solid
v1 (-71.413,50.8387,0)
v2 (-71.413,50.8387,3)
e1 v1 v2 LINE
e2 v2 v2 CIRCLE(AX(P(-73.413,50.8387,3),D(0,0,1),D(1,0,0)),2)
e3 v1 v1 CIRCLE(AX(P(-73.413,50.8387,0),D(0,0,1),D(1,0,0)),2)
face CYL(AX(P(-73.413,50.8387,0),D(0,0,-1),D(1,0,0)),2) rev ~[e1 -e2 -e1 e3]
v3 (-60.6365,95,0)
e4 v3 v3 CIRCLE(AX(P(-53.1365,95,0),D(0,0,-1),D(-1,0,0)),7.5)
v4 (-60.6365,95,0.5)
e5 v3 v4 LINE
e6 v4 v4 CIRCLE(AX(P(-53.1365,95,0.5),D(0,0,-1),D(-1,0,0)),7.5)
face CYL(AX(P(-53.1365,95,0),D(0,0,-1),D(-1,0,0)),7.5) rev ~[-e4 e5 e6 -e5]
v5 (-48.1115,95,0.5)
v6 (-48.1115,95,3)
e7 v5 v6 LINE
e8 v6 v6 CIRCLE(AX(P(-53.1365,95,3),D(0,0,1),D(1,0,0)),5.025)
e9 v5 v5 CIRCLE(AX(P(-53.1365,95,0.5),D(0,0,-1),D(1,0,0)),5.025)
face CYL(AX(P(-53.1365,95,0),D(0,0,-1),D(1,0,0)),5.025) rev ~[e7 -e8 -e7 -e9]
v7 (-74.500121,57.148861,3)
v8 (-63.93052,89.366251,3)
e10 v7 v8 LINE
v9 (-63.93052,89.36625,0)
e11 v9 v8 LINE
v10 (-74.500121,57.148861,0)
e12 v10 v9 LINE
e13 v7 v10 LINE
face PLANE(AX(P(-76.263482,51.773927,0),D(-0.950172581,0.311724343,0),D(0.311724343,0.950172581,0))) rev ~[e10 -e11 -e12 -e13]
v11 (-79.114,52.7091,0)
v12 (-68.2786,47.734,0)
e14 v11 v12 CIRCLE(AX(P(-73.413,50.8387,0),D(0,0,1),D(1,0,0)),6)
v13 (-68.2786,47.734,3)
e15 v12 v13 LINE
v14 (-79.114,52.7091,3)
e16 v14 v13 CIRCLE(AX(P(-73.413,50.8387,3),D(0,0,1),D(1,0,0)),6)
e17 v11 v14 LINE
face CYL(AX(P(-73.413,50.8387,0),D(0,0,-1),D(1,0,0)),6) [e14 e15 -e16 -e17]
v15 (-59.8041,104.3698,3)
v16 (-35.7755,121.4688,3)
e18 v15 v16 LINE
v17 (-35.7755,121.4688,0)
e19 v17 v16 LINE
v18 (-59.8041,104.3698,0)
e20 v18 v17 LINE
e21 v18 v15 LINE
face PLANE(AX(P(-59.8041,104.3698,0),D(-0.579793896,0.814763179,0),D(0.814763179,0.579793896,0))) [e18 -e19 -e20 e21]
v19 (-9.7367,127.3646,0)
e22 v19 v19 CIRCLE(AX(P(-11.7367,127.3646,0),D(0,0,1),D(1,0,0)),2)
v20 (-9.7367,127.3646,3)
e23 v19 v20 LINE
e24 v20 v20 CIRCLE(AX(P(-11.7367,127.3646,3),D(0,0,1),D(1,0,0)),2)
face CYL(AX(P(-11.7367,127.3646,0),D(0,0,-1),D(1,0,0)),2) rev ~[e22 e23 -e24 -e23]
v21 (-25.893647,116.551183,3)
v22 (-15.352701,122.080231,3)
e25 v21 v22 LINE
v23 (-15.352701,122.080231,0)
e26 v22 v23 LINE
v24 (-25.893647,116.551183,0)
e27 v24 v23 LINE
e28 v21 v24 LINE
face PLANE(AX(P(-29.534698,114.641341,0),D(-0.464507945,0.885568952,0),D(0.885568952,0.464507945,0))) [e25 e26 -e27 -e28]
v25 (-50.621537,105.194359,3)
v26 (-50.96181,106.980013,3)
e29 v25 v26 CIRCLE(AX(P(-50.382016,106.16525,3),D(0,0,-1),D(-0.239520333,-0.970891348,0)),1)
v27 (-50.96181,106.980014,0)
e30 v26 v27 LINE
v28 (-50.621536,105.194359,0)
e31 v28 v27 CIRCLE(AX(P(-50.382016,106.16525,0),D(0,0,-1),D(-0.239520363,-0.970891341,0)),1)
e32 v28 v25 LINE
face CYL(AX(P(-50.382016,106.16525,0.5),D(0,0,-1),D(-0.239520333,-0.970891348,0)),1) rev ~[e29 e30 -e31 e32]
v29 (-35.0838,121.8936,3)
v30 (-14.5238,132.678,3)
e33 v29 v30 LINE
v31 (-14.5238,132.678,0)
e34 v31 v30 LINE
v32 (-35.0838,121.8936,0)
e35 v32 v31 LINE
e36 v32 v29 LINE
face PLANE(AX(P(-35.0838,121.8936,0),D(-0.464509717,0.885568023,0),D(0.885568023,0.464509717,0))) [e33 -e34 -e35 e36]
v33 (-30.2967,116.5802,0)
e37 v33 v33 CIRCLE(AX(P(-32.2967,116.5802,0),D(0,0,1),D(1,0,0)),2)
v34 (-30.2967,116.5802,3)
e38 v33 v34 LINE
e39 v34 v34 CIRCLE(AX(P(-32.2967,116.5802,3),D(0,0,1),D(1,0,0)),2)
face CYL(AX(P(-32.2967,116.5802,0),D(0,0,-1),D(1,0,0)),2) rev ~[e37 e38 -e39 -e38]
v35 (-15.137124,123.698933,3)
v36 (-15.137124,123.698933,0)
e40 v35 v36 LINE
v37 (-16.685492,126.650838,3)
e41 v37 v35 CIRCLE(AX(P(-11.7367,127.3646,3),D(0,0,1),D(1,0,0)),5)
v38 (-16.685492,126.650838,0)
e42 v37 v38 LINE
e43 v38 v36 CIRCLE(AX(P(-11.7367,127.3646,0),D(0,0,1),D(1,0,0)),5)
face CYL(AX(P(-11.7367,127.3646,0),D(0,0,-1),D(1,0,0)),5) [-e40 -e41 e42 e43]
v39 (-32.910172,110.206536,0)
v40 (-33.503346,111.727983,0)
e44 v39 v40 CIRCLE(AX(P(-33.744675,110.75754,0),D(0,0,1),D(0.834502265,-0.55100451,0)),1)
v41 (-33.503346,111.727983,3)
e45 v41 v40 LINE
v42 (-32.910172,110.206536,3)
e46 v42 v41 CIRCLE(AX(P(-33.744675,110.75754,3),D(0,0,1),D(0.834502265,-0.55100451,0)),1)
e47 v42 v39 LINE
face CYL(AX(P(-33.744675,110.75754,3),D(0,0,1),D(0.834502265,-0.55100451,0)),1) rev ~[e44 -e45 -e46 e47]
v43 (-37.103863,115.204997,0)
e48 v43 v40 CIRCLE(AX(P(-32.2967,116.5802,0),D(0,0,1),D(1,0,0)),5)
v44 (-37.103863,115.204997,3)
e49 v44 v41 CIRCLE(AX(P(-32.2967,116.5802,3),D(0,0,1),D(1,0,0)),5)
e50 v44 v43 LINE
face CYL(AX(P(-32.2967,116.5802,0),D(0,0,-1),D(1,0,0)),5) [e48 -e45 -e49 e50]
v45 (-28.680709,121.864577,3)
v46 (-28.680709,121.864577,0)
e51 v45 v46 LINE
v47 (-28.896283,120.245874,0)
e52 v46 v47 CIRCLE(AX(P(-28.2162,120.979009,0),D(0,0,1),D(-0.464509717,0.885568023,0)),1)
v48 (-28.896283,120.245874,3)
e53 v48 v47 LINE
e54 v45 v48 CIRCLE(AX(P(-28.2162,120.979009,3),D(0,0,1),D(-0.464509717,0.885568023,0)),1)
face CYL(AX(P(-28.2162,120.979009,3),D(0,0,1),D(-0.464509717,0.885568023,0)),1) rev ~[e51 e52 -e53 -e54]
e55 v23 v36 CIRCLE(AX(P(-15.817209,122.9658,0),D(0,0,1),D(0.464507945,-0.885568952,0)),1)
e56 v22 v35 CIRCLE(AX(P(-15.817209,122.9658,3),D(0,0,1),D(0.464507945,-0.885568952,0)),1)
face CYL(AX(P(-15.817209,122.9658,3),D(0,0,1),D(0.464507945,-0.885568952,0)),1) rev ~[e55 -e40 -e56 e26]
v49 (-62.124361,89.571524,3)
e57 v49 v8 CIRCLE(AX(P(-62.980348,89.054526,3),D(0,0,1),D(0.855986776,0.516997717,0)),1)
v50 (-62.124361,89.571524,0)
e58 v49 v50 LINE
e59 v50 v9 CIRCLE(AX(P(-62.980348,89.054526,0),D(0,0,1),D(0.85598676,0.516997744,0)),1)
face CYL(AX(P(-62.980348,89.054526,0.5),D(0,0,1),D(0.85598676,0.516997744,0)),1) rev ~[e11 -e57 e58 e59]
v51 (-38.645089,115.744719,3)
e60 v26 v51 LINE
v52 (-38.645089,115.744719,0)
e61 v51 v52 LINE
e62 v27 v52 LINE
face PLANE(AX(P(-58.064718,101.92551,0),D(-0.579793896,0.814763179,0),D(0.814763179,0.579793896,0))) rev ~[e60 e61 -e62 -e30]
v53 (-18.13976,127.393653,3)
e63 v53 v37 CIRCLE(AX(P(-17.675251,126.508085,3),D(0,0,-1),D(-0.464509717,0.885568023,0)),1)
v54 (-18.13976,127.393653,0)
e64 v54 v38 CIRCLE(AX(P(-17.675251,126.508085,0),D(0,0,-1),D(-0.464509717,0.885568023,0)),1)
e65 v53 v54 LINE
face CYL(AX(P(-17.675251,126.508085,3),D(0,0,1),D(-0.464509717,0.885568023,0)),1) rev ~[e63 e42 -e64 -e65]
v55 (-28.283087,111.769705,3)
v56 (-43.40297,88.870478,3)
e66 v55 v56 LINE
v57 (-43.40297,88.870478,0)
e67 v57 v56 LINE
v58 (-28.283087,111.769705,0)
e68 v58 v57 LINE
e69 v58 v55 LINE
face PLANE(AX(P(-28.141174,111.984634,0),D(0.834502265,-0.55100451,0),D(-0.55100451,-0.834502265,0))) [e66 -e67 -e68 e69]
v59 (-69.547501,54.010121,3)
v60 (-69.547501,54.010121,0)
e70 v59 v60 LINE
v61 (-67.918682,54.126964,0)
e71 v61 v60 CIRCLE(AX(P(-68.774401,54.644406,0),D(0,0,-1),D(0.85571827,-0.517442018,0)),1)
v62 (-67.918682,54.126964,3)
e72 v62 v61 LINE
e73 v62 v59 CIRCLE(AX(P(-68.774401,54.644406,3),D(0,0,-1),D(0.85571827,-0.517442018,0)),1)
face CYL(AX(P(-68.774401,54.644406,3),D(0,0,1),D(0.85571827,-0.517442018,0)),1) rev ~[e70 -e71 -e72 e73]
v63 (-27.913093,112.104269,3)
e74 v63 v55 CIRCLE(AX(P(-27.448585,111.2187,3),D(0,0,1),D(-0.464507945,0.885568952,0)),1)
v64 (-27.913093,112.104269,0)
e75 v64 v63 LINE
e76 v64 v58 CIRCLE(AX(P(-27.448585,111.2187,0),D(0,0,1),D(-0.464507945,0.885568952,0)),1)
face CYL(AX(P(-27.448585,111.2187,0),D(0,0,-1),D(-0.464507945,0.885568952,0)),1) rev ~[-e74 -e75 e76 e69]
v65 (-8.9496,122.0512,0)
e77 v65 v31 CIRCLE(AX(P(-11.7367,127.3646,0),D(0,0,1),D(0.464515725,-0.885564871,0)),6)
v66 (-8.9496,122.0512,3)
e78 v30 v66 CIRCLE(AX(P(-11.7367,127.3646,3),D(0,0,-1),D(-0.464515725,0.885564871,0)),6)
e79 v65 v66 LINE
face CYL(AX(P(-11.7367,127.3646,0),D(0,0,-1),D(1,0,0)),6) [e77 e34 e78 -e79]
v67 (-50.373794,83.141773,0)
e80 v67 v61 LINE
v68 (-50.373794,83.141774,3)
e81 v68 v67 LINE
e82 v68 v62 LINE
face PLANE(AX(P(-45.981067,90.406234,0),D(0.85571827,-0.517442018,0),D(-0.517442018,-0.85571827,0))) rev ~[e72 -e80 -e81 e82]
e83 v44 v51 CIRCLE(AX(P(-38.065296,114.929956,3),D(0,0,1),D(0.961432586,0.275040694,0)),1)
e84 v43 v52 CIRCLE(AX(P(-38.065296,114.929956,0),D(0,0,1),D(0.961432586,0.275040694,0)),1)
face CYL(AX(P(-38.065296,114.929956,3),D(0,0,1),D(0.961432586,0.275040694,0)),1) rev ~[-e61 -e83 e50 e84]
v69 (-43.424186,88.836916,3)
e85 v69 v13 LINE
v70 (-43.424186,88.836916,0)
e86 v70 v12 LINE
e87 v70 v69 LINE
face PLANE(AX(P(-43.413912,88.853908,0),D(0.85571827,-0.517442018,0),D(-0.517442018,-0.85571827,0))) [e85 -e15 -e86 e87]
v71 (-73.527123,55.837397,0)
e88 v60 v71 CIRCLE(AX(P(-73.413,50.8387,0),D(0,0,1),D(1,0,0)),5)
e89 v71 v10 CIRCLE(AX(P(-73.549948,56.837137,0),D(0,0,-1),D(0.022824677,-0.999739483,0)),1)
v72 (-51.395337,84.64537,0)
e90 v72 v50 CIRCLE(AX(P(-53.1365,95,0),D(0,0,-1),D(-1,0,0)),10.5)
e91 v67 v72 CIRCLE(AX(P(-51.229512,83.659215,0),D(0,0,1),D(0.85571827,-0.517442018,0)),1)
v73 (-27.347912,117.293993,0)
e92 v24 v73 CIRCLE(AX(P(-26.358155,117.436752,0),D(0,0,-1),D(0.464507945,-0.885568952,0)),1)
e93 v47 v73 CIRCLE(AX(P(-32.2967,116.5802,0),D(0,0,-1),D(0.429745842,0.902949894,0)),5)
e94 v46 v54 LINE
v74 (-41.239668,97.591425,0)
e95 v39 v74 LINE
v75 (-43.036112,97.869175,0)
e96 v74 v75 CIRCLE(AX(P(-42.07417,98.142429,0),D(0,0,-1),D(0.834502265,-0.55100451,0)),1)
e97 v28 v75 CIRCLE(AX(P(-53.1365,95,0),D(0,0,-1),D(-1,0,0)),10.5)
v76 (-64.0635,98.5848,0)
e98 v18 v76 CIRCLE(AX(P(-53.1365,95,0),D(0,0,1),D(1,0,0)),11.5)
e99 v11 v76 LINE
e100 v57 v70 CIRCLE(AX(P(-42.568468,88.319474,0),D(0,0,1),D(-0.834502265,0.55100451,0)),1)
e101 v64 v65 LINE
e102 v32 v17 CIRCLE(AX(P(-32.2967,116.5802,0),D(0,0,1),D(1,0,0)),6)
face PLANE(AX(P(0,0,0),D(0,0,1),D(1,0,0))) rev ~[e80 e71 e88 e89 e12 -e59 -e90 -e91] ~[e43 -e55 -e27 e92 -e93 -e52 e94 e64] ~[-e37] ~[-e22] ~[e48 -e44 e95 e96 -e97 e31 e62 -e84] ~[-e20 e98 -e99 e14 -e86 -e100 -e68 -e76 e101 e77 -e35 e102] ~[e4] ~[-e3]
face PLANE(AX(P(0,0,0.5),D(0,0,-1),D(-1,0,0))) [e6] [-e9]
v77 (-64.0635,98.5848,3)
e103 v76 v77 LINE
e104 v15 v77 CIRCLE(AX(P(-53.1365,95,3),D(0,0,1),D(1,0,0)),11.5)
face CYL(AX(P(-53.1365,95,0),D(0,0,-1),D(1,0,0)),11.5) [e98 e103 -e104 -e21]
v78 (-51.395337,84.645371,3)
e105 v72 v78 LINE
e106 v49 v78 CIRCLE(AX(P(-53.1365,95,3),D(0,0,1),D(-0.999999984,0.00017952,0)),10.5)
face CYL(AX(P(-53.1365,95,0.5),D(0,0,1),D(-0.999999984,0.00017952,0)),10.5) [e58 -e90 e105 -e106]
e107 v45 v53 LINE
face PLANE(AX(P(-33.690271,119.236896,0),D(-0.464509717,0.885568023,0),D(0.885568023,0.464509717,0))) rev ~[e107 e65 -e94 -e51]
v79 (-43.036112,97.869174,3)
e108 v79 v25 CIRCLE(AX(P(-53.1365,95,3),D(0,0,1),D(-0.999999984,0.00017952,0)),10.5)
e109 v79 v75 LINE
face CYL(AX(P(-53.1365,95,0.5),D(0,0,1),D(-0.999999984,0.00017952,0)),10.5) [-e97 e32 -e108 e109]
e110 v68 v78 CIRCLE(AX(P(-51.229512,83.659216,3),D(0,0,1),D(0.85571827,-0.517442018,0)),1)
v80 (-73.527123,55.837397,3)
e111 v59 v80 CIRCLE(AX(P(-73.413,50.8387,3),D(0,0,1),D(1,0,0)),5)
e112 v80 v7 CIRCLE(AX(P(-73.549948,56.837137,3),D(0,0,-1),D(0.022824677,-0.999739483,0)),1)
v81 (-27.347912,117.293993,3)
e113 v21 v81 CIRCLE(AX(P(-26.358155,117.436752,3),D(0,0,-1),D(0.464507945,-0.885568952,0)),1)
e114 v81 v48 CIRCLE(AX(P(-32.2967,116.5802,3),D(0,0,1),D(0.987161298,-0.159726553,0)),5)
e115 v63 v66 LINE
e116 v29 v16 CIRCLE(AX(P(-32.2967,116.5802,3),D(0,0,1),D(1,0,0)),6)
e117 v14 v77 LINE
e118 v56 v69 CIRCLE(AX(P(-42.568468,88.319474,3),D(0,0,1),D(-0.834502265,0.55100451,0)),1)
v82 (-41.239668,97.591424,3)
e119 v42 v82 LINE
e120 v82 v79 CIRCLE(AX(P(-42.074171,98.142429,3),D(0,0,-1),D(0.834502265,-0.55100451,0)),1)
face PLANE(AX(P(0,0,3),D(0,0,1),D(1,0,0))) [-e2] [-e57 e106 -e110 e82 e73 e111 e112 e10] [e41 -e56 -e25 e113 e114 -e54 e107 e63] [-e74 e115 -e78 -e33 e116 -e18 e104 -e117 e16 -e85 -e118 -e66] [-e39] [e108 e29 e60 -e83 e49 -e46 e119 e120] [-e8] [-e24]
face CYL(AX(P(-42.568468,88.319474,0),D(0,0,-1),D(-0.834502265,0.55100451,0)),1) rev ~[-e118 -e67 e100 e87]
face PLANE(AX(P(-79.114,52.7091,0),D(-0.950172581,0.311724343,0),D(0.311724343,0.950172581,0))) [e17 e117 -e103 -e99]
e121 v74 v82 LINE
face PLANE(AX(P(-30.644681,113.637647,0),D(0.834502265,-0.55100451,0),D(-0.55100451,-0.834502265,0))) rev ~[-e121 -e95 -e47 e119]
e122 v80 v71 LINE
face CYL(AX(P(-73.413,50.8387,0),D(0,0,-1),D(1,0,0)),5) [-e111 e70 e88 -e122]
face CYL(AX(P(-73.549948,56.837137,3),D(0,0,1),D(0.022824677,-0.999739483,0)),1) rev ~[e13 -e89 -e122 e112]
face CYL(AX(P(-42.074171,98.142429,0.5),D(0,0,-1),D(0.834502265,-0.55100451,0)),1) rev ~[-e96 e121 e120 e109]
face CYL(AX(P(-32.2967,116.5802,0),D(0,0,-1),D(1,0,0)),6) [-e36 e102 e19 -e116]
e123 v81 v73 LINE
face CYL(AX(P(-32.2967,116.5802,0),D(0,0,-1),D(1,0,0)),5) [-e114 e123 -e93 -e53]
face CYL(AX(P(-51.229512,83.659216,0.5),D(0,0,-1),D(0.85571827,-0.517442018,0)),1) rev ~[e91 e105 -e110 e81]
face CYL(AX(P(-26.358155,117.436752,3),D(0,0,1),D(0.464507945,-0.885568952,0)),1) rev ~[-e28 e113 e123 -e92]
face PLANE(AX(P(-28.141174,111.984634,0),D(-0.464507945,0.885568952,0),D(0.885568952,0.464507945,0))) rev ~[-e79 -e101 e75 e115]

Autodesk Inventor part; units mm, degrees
ref_plane "YZ Plane" through (0, 0, 0) normal (1, 0, 0) x (0, 1, 0)
ref_plane "XZ Plane" through (0, 0, 0) normal (0, 1, 0) x (-1, 0, 0)
ref_plane "XY Plane" through (0, 0, 0) normal (0, 0, 1) x (1, 0, 0)
sketch "スケッチ1" plane through (0, 0, 0) normal (0, 0, 1) x (1, 0, 0)
  circle A0 centre (-73.413, 50.8387) radius 2
  circle A1 centre (-11.7367, 127.3646) radius 2
  circle A2 centre (-32.2967, 116.5802) radius 2
  circle A3 centre (-53.1365, 95) radius 5.025
  circle A4 centre (-11.7367, 127.3646) radius 6
  circle A5 centre (-32.2967, 116.5802) radius 6
  circle A6 centre (-53.1365, 95) radius 11.5
  circle A7 centre (-73.413, 50.8387) radius 6
  line L0 (-79.114, 52.7091) -> (-64.0635, 98.5848)
  line L1 (-59.8041, 104.3698) -> (-35.7755, 121.4688)
  line L2 (-35.0838, 121.8936) -> (-14.5238, 132.678)
  line L3 (-29.5097, 111.2668) -> (-8.9496, 122.0512)
  line L4 (-27.2897, 113.2742) -> (-43.5397, 88.6634)
  line L5 (-43.2957, 89.0494) -> (-68.2786, 47.734)
  circle A8 centre (-53.1365, 95) radius 7.5
  point P0 (0, 0)
  point P1 (-43.4139, 88.854)
  point P2 (-28.1412, 111.9846)
  dimension "d0" = 4
  dimension "d1" = 4
  dimension "d2" = 4
  dimension "d3" = 10.05
  dimension "d4" = 4
  dimension "d5" = 4
  dimension "d7" = 4
  dimension "d15" = 15
  dimension "d16" = 4
extrude "押し出し1" add sketch "スケッチ1" along normal blind 3 contours A4 | A4 L3 L4 A5 L2 | A5 | L4 L5 A6 L1 A5 L3 | L3 A5 L4 | L5 A7 L0 A6 L4 | L4 A6 L5 | A6 | A7 | A8
sketch "スケッチ2" plane through (0, 0, 0) normal (0, 0, -1) x (-1, 0, 0)
  circle A0 centre (53.1365, 95) radius 5.025 projected
  circle A1 centre (53.1365, 95) radius 7.5
  point P0 (0, 0)
  dimension "d12" = 15
extrude "押し出し2" cut sketch "スケッチ2" against normal blind 0.5
shell "シェル2" thickness 3 removed faces 2 at (-67.6516, 80.9362, 0) at (-66.6917, 80.9872, 3)
fillet "フィレット2" radius 1 19 edges at (-43.4139, 88.854, 1.5) (-28.1412, 111.9846, 1.5) (-75.0166, 55.5746, 1.5) (-63.1345, 91.7924, 1.75) (-63.1345, 91.7924, 0.25) (-68.776, 52.7092, 1.5) (-49.0526, 85.3267, 0.25) (-49.0526, 85.3267, 1.75) (-45.6365, 95, 0.5) (-53.0422, 105.4996, 0.25) (-53.0422, 105.4996, 1.75) (-37.2952, 116.7053, 1.5) (-42.6466, 95.4607, 0.25) (-31.9972, 111.5892, 1.5) (-42.6466, 95.4607, 1.75) (-30.148, 121.0949, 1.5) (-16.6725, 128.1633, 1.5) (-27.3609, 115.7815, 1.5) (-13.8854, 122.8499, 1.5)
sketch "スケッチ3" plane through (0, 0, 0) normal (0, 0, -1) x (-1, 0, 0)
  circle A0 centre (53.1365, 95) radius 5.025 projected
  circle A1 centre (53.1365, 95) radius 7.5
  point P0 (0, 0)
  dimension "d19" = 15
extrude "押し出し3" cut sketch "スケッチ3" against normal blind 0.5 contours A0 | A1
properties part number "アーム軸抑え3" material "アルミニウム 2014-T4"
